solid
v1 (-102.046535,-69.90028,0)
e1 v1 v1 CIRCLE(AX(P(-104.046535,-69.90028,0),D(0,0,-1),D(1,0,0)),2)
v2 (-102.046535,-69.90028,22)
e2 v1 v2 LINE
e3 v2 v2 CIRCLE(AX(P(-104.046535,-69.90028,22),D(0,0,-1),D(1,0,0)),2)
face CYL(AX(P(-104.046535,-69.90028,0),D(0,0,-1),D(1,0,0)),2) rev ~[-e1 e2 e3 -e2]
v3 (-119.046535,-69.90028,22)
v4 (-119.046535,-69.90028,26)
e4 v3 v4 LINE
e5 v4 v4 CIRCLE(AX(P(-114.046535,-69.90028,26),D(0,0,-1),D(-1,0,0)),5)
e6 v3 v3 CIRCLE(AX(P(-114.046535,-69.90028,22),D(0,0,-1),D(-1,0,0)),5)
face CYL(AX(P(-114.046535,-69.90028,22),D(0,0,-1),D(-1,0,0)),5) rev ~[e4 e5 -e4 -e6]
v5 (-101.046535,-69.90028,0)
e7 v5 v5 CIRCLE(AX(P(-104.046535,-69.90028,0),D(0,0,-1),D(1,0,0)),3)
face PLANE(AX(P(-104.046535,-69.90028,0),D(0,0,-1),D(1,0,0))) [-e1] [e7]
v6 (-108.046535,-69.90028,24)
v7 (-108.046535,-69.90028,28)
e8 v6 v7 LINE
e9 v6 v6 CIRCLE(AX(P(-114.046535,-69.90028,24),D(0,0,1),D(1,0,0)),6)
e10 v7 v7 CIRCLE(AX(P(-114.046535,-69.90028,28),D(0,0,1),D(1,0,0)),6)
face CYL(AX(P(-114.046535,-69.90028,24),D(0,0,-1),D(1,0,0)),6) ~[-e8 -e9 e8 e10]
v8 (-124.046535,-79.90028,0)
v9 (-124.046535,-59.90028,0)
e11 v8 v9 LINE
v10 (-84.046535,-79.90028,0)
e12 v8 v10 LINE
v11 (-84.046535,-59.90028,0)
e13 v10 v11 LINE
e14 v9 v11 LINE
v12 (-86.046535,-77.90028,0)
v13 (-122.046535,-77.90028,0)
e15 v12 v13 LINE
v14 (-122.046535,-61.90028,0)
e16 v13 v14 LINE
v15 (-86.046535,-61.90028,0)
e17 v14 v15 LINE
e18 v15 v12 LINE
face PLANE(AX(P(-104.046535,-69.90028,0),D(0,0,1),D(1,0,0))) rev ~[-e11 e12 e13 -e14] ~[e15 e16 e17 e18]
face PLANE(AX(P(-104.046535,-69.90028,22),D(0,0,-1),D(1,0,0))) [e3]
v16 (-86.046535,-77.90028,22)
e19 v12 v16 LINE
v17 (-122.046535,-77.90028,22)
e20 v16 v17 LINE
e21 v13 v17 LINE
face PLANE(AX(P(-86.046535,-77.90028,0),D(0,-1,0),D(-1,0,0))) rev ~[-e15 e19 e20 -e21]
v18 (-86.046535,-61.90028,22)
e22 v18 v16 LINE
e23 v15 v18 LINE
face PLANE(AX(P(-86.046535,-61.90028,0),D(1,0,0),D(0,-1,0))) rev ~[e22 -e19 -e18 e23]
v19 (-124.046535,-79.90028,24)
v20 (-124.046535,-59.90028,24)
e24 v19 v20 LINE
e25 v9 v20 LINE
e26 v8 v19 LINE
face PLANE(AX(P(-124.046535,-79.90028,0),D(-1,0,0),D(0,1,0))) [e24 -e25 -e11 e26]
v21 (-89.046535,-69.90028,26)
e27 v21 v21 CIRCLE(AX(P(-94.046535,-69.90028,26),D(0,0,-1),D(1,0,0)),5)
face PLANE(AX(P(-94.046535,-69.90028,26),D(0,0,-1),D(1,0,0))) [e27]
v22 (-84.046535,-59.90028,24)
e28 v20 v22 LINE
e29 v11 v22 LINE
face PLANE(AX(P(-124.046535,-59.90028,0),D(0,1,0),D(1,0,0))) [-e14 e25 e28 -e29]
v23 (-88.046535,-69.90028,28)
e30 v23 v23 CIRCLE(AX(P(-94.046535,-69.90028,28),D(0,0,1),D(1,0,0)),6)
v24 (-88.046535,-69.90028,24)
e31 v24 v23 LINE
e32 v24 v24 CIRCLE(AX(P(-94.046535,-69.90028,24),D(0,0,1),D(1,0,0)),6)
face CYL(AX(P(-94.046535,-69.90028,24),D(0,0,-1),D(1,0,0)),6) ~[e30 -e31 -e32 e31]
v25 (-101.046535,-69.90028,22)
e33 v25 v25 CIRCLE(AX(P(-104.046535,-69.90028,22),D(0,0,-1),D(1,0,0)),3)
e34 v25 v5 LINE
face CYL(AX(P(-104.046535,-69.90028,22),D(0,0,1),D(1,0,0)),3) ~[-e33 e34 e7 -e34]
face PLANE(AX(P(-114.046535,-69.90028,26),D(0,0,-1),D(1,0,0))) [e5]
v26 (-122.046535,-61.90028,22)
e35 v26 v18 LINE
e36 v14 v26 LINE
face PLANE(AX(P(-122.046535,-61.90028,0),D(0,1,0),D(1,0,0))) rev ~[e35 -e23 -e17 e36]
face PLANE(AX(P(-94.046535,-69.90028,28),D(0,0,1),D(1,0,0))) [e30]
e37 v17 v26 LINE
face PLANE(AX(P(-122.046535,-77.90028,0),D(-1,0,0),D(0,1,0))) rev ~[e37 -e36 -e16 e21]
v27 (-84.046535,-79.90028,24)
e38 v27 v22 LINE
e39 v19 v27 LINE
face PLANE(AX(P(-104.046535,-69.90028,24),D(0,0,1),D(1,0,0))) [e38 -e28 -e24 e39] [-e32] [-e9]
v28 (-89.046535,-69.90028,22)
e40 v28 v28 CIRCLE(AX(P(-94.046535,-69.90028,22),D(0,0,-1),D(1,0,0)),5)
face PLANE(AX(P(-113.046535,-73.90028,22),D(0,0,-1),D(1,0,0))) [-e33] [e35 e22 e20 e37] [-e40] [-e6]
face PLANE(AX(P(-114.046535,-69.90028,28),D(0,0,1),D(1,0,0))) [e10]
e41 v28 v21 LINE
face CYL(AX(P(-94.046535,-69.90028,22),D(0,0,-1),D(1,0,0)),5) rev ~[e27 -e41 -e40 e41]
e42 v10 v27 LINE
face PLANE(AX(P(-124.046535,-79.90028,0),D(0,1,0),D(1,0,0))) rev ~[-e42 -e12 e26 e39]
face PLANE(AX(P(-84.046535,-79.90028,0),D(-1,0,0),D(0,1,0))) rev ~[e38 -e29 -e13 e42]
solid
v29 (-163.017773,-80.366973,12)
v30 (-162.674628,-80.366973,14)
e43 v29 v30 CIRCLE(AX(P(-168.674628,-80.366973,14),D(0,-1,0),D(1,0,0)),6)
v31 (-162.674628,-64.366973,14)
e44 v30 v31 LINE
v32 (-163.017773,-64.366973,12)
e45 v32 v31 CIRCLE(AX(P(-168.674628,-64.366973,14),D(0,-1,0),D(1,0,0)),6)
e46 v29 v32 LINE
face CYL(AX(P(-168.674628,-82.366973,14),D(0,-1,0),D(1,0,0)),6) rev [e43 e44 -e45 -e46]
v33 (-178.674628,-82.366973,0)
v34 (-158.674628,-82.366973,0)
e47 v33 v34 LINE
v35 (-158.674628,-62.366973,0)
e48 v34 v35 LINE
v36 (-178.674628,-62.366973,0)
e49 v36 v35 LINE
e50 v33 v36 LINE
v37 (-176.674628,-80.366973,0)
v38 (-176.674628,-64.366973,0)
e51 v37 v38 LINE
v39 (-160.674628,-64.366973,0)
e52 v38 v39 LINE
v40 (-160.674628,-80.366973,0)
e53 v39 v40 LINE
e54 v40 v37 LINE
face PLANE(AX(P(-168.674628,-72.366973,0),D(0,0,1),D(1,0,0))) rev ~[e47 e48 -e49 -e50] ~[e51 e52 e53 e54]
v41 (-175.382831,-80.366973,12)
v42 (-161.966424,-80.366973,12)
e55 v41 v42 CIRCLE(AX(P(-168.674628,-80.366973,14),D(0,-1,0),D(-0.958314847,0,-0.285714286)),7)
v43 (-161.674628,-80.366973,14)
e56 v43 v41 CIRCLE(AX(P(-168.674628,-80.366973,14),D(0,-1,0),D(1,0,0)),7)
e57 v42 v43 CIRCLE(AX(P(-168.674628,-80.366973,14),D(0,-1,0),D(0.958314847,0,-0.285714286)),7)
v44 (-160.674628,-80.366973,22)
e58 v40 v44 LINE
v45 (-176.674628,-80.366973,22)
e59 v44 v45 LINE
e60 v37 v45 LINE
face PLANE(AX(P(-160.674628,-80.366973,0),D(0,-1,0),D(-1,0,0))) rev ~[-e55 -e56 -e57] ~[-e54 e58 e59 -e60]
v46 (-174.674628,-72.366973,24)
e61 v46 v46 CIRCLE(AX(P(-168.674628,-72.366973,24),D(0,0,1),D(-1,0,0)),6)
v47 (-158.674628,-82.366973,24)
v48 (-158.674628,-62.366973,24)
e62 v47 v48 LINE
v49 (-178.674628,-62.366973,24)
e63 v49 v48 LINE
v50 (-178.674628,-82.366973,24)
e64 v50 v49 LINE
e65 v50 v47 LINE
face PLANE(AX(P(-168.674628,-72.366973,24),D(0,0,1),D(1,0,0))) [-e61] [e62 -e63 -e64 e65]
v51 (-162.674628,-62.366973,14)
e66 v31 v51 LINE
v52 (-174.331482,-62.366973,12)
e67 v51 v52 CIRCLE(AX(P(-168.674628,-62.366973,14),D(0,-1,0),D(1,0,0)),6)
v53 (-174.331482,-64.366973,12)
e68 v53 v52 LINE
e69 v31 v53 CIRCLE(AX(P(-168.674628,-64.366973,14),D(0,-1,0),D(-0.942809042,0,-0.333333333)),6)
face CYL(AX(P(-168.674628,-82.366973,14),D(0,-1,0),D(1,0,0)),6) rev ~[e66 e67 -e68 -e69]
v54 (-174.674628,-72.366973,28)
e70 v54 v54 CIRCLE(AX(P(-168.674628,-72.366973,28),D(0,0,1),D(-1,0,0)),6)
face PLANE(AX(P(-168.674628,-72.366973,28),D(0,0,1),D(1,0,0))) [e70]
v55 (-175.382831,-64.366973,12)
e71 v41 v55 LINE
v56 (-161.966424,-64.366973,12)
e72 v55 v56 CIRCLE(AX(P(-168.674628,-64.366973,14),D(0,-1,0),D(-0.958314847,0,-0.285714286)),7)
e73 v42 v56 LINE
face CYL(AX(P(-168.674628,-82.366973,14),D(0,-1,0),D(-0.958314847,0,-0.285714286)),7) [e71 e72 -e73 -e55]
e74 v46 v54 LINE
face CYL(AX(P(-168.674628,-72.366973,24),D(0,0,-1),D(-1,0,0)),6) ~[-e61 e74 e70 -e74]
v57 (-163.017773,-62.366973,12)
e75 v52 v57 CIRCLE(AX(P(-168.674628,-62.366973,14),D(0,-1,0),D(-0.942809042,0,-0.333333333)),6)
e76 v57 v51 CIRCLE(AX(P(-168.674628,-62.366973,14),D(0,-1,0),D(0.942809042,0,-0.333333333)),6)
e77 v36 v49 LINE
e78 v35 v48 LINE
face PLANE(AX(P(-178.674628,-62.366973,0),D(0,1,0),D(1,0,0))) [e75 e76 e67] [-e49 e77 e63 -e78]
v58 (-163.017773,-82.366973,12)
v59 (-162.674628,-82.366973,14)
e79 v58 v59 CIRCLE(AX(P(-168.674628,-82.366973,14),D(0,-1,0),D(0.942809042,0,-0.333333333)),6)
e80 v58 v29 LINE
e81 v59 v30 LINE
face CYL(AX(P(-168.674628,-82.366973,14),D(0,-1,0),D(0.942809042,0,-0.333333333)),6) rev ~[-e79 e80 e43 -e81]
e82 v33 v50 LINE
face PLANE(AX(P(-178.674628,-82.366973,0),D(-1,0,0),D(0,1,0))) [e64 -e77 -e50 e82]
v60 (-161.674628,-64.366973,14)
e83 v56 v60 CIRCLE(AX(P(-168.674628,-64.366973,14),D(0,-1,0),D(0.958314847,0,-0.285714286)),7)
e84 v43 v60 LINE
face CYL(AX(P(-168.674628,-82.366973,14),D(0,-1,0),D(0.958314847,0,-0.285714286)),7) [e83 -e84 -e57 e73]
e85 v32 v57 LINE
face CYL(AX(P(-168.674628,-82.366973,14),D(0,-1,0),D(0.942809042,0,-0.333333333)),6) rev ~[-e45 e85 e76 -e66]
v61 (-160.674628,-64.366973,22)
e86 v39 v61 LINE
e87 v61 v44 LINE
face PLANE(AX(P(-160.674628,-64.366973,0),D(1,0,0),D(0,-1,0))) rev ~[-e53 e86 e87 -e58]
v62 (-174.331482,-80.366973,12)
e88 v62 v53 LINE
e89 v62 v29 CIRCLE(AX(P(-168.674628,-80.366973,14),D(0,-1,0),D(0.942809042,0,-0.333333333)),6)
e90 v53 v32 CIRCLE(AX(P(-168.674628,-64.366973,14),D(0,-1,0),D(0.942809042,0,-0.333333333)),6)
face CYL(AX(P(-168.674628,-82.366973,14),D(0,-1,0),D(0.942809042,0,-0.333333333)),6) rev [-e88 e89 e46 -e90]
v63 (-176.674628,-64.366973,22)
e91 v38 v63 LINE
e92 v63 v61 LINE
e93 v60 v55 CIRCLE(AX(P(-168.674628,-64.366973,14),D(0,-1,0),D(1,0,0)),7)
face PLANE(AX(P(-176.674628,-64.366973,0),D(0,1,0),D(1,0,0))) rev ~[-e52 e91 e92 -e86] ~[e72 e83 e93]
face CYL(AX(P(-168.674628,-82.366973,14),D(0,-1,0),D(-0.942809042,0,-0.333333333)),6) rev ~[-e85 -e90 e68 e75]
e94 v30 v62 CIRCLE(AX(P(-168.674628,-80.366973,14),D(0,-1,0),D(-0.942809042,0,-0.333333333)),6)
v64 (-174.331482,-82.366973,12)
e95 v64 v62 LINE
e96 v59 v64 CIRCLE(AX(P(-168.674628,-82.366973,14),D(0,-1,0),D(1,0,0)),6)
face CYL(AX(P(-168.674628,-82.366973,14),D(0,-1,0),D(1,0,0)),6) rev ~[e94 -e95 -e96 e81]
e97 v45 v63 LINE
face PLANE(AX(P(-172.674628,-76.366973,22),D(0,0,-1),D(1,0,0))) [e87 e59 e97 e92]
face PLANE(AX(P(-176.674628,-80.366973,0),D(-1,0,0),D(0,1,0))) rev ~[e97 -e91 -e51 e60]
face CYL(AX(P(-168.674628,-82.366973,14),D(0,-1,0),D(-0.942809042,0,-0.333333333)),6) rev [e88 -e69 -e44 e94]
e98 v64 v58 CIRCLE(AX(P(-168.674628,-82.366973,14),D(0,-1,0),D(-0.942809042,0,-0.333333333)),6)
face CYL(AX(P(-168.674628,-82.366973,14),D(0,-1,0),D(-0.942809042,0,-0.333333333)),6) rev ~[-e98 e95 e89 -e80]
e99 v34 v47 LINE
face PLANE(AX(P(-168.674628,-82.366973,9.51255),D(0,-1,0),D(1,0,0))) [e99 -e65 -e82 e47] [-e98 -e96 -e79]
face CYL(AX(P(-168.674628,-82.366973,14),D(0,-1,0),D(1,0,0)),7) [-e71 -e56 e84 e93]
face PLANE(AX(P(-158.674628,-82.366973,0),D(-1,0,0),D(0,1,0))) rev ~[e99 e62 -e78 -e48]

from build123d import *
from build123d import SkipClean  # not in build123d's __all__

# Parameters (mm, degrees)
F0_W      = 40
F0_H      = 20
F1_DEPTH  = 24
F2_R      = 6
F3_DEPTH  = 4
F4_W      = 18
F4_H      = 8
F5_DEPTH  = 22
F6_R      = 5
F7_DEPTH  = 4
F9_DEPTH  = 22
F10_R     = 2
F11_DEPTH = 22
F12_W     = 20
F12_H     = 20
F13_DEPTH = 24
F15_DEPTH = 4
F16_W     = 8
F16_H     = 8
F17_DEPTH = 22
F19_DEPTH = 20
F20_DEPTH = 25


with BuildPart() as f1:
    # F0 (on Top) → F1 (new body)
    with BuildSketch(Plane.XY):
        with Locations((-104.0465351939, -69.9002796412)):
            Rectangle(F0_W, F0_H)
    extrude(amount=F1_DEPTH)

    # F2 (on face) → F3 (join)
    with BuildSketch(Plane.XY.offset(24)):
        with BuildLine():
            ThreePointArc((-120.0465351939, -69.9002796412), (-114.0465351939, -75.9002796412), (-108.0465351939, -69.9002796412))
            ThreePointArc((-108.0465351939, -69.9002796412), (-114.0465351939, -63.9002796412), (-120.0465351939, -69.9002796412))
        make_face()
        with Locations((-94.0465351939, -69.9002796412)):
            Circle(F2_R)
    extrude(amount=F3_DEPTH)

    # F4 (on face) → F5 (cut)
    with BuildSketch(Plane(origin=(0, 0, 0), x_dir=(1, 0, 0), z_dir=(0, 0, -1))):
        with Locations((-113.0465351939, 73.9002796412)):
            Rectangle(F4_W, F4_H)
        with Locations((-113.0465351939, 65.9002796412)):
            Rectangle(F4_W, F4_H)
        with Locations((-95.0465351939, 65.9002796412)):
            Rectangle(F4_W, F4_H)
        with Locations((-95.0465351939, 73.9002796412)):
            Rectangle(F4_W, F4_H)
    extrude(amount=-F5_DEPTH, mode=Mode.SUBTRACT)

    # F6 (on face) → F7 (cut)
    with BuildSketch(Plane(origin=(0, 0, 22), x_dir=(1, 0, 0), z_dir=(0, 0, -1))):
        with Locations((-94.0465351939, 69.9002796412)):
            Circle(F6_R)
        with BuildLine():
            ThreePointArc((-109.0465351939, 69.9002796412), (-114.0465351939, 74.9002796412), (-119.0465351939, 69.9002796412))
            ThreePointArc((-119.0465351939, 69.9002796412), (-114.0465351939, 64.9002796412), (-109.0465351939, 69.9002796412))
        make_face()
    extrude(amount=-F7_DEPTH, mode=Mode.SUBTRACT)

    # F8 (on face) → F9 (join)
    with BuildSketch(Plane(origin=(0, 0, 22), x_dir=(1, 0, 0), z_dir=(0, 0, -1))):
        with BuildLine():
            ThreePointArc((-107.0465351939, 69.9002796412), (-104.0465351939, 66.9002796412), (-101.0465351939, 69.9002796412))
            ThreePointArc((-101.0465351939, 69.9002796412), (-104.0465351939, 72.9002796412), (-107.0465351939, 69.9002796412))
        make_face()
    extrude(amount=F9_DEPTH)

    # F10 (on face) → F11 (cut)
    with BuildSketch(Plane(origin=(0, 0, 0), x_dir=(1, 0, 0), z_dir=(0, 0, -1))):
        with Locations((-104.0465351939, 69.9002796412)):
            Circle(F10_R)
    extrude(amount=-F11_DEPTH, mode=Mode.SUBTRACT)


with BuildPart() as f13:
    # F12 (on Top) → F13 (new body)
    with BuildSketch(Plane.XY):
        with Locations((-168.6746275425, -72.3669731617)):
            Rectangle(F12_W, F12_H)
    extrude(amount=F13_DEPTH)

    # F14 (on face) → F15 (join)
    with BuildSketch(Plane.XY.offset(24)):
        with BuildLine():
            ThreePointArc((-162.6746275425, -72.3669731617), (-168.6746275425, -66.3669731617), (-174.6746275425, -72.3669731617))
            ThreePointArc((-174.6746275425, -72.3669731617), (-168.6746275425, -78.3669731617), (-162.6746275425, -72.3669731617))
        make_face()
    extrude(amount=F15_DEPTH)

    # F16 (on face) → F17 (cut)
    with BuildSketch(Plane(origin=(0, 0, 0), x_dir=(1, 0, 0), z_dir=(0, 0, -1))):
        with Locations((-172.6746275425, 76.3669731617)):
            Rectangle(F16_W, F16_H)
        with Locations((-172.6746275425, 68.3669731617)):
            Rectangle(F16_W, F16_H)
        with Locations((-164.6746275425, 76.3669731617)):
            Rectangle(F16_W, F16_H)
        with Locations((-164.6746275425, 68.3669731617)):
            Rectangle(F16_W, F16_H)
    extrude(amount=-F17_DEPTH, mode=Mode.SUBTRACT)

    # F18 (on face) → F19 (join)
    with BuildSketch(Plane.XZ.offset(82.3669731617)):
        with BuildLine():
            Line((-174.331481792, 12), (-175.382831475, 12))
            ThreePointArc((-175.382831475, 12), (-168.6746275425, 7), (-161.96642361, 12))
            Line((-161.96642361, 12), (-163.017773293, 12))
            ThreePointArc((-163.017773293, 12), (-168.6746275425, 8), (-174.331481792, 12))
        make_face()
        with BuildLine():
            ThreePointArc((-161.6746275425, 14), (-169.6852146175, 20.9266668581), (-175.382831475, 12))
            Line((-175.382831475, 12), (-174.331481792, 12))
            ThreePointArc((-174.331481792, 12), (-169.6892394149, 19.9135913579), (-162.6746275425, 14))
            ThreePointArc((-162.6746275425, 14), (-162.7610361846, 12.9853881276), (-163.017773293, 12))
            Line((-163.017773293, 12), (-161.96642361, 12))
            ThreePointArc((-161.96642361, 12), (-161.7479606843, 12.989412925), (-161.6746275425, 14))
        make_face()
    extrude(amount=-F19_DEPTH)

    # F18 (on face) → F20 (cut)
    with BuildSketch(Plane.XZ.offset(82.3669731617)):
        with BuildLine():
            ThreePointArc((-162.6746275425, 14), (-169.6892394149, 19.9135913579), (-174.331481792, 12))
            Line((-174.331481792, 12), (-168.6746275425, 12))
            Line((-168.6746275425, 12), (-163.017773293, 12))
            ThreePointArc((-163.017773293, 12), (-162.7610361846, 12.9853881276), (-162.6746275425, 14))
        make_face()
        with BuildLine():
            Line((-168.6746275425, 12), (-174.331481792, 12))
            ThreePointArc((-174.331481792, 12), (-168.6746275425, 8), (-163.017773293, 12))
            Line((-163.017773293, 12), (-168.6746275425, 12))
        make_face()
    with SkipClean():  # cleaning this boolean's faces spoils the solid; the shape is the same uncleaned
        extrude(amount=-F20_DEPTH, mode=Mode.SUBTRACT)


solid = Compound([f1.part, f13.part])
